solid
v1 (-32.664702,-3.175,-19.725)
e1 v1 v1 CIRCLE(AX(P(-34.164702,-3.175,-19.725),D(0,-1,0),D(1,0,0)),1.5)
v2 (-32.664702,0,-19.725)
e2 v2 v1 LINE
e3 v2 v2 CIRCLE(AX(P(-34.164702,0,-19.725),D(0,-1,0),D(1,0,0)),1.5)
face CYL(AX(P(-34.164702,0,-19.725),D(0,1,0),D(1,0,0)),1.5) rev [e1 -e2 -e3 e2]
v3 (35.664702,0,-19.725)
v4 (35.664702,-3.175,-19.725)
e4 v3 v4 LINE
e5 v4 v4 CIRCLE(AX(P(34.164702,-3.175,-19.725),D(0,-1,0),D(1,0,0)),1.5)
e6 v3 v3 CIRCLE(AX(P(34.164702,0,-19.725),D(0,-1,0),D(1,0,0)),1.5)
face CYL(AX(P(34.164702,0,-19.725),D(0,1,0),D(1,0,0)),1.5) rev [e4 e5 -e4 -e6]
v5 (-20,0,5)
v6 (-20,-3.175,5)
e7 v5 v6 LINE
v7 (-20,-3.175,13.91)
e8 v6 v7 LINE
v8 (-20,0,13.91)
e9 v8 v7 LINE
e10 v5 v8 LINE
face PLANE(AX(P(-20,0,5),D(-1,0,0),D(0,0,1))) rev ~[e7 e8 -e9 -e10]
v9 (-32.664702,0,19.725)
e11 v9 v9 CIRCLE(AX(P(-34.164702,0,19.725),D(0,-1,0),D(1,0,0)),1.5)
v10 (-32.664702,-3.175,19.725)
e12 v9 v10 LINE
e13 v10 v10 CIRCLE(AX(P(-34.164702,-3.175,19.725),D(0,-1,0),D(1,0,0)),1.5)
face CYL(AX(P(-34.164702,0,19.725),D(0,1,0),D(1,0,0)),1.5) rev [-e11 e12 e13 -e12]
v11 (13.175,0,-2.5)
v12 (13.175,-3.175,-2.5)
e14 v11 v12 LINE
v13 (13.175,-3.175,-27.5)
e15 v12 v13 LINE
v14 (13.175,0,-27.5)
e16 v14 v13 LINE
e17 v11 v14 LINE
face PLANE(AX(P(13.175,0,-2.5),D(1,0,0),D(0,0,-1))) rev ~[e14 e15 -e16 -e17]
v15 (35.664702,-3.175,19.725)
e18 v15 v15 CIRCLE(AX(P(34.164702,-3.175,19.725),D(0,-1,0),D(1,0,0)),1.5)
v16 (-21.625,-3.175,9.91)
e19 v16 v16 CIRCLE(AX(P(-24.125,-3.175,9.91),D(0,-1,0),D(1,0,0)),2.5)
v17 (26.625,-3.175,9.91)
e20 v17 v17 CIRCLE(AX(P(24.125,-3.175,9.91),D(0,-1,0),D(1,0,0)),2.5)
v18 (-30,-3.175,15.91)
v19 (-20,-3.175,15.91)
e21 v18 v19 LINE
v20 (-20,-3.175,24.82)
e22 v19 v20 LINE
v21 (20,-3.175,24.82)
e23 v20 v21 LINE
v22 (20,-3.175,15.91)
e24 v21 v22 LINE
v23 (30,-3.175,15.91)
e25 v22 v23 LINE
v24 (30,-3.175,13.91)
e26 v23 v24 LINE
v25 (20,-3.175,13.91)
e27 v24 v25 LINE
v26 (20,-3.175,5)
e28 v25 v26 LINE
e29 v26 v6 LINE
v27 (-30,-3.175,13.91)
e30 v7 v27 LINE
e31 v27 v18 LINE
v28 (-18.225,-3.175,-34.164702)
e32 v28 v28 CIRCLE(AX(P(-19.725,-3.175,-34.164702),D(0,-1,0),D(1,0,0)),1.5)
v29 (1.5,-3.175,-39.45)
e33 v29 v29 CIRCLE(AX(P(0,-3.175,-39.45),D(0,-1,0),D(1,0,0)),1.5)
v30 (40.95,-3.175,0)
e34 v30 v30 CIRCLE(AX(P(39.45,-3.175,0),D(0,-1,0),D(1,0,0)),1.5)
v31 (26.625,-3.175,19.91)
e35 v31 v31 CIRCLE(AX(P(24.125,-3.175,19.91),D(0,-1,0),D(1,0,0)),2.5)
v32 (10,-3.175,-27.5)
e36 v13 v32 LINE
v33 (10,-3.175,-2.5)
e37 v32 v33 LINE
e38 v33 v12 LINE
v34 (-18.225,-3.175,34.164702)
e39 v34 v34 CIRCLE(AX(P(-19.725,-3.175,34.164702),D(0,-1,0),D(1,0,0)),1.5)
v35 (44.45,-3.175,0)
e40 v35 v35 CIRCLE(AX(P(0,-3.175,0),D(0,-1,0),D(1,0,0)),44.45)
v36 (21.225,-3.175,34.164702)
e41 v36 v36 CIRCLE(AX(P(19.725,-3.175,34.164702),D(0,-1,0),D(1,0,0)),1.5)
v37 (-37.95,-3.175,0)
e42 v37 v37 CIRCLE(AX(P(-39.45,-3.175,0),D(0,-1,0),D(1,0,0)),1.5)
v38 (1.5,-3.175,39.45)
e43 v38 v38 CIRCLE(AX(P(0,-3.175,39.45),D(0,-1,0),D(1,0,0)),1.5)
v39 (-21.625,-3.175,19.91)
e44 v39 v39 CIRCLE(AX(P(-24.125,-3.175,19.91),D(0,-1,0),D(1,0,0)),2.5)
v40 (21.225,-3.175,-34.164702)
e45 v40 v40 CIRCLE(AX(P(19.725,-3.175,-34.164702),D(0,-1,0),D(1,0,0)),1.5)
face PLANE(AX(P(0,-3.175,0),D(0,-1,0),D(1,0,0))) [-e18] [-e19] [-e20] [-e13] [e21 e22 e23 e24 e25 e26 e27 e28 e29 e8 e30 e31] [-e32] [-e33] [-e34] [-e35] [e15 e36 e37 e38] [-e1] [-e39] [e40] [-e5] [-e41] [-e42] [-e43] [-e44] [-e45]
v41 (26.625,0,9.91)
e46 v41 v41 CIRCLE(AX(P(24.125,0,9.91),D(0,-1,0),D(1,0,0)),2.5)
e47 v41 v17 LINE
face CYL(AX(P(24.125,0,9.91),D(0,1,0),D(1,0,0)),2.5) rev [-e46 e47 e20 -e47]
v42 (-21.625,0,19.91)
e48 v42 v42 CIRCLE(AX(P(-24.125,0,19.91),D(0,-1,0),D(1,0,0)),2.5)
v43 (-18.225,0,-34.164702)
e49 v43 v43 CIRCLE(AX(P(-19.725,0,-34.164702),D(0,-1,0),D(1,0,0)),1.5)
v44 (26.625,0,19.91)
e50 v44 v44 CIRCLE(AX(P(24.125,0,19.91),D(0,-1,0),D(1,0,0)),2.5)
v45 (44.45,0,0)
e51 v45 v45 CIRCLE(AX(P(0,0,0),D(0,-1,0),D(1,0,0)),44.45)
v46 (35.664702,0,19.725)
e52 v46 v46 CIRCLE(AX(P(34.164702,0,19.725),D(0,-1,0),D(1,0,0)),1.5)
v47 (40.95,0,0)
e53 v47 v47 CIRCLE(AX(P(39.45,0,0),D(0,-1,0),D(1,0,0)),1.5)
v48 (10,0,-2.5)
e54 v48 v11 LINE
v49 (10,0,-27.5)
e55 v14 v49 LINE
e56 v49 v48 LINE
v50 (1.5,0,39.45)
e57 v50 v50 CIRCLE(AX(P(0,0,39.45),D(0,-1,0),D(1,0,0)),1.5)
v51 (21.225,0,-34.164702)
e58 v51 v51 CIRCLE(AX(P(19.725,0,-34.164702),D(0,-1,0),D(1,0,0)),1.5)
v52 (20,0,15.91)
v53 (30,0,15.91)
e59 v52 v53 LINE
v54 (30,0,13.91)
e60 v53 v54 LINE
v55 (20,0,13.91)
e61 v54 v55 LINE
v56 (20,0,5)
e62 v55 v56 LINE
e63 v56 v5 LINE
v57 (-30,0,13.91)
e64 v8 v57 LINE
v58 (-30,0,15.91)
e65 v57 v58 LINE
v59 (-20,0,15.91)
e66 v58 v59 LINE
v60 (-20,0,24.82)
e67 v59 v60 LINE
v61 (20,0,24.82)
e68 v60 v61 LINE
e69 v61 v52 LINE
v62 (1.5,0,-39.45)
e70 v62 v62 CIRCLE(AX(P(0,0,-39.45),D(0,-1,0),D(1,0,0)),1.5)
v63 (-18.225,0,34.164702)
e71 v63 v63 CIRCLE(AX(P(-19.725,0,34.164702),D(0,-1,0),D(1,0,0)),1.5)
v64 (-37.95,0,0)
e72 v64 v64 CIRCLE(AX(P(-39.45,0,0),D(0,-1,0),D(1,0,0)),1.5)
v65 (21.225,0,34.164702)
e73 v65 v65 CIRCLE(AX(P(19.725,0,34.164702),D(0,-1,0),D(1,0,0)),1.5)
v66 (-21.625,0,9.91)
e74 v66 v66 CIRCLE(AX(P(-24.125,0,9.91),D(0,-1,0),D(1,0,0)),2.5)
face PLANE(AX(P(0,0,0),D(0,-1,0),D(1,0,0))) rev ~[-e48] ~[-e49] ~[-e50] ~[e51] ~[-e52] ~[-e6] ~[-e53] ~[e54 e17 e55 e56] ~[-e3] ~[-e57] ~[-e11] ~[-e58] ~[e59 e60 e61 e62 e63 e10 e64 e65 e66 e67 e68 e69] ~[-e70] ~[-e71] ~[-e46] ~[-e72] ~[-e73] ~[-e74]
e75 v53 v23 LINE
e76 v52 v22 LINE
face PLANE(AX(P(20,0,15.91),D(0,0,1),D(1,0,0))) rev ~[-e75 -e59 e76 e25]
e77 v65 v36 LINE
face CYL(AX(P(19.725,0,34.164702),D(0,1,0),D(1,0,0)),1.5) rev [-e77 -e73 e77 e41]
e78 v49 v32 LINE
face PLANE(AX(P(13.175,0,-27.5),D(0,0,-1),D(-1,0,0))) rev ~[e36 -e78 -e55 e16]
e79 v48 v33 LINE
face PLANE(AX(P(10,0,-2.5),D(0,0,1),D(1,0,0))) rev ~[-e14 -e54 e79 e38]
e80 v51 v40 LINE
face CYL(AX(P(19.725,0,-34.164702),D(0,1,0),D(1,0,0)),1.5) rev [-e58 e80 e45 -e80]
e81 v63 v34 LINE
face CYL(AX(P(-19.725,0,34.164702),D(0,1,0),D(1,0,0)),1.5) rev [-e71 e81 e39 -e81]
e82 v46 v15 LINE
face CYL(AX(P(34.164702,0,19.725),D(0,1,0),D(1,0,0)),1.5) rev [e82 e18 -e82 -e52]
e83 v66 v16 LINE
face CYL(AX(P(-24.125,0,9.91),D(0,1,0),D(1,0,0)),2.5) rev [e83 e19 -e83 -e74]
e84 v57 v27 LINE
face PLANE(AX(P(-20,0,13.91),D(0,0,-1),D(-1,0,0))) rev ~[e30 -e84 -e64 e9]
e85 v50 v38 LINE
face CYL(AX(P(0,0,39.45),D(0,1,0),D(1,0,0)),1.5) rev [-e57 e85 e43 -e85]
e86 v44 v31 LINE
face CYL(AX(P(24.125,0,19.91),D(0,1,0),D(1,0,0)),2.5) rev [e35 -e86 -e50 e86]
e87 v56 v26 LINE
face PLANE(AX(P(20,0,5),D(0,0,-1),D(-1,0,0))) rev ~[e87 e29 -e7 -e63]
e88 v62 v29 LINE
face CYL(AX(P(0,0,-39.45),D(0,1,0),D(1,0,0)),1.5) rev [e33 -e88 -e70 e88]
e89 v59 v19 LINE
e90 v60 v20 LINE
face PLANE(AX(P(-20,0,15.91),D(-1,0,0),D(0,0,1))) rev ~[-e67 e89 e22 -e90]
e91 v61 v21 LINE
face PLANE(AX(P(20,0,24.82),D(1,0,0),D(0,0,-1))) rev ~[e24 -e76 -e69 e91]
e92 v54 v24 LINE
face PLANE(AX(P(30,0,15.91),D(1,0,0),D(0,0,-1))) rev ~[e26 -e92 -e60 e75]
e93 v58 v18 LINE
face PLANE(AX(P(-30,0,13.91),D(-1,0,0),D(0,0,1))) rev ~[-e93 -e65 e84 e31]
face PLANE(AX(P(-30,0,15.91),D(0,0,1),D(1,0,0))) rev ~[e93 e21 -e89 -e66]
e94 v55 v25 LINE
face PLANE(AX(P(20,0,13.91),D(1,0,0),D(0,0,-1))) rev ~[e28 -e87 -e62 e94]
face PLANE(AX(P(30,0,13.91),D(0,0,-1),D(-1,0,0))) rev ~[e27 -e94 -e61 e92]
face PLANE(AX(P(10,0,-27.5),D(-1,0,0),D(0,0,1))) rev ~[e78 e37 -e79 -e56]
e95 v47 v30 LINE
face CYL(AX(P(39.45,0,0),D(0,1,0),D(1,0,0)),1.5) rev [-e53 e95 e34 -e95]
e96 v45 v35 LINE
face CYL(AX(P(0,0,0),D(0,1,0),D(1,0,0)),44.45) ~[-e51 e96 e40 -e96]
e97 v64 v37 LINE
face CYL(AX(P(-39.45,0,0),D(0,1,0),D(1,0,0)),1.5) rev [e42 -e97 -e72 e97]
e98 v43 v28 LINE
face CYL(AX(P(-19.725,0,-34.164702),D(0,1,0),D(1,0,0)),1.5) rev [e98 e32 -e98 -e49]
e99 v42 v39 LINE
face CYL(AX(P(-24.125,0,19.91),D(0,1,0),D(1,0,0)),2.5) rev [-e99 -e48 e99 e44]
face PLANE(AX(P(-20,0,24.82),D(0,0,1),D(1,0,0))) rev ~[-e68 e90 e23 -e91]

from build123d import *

# Parameters (mm, degrees)
F0_R     = 44.45
F0_R_2   = 1.5
F0_R_3   = 2.5
F1_DEPTH = 3.175


# Not quite as in the source:
# - a length typed as a fraction of an inch, garbled in the dataset ("3 / 203.2 mm" for 3/8 in), is restored


with BuildPart() as f1:
    # F0 (on Front) → F1 (new body)
    with BuildSketch(Plane.XZ):
        Circle(F0_R)
        with Locations((-19.725, -34.1647021793)):
            Circle(F0_R_2, mode=Mode.SUBTRACT)
        with Locations((-34.1647021793, -19.725)):
            Circle(F0_R_2, mode=Mode.SUBTRACT)
        with Locations((0, -39.45)):
            Circle(F0_R_2, mode=Mode.SUBTRACT)
        with Locations((19.725, -34.1647021793)):
            Circle(F0_R_2, mode=Mode.SUBTRACT)
        Polygon((10, -27.5), (10, -15), (10, -2.5), (13.175, -2.5), (13.175, -15), (13.175, -27.5), align=None, mode=Mode.SUBTRACT)
        with Locations((34.1647021793, -19.725)):
            Circle(F0_R_2, mode=Mode.SUBTRACT)
        with Locations((-39.45, 0)):
            Circle(F0_R_2, mode=Mode.SUBTRACT)
        with Locations((-24.125, 9.91)):
            Circle(F0_R_3, mode=Mode.SUBTRACT)
        with Locations((-34.1647021793, 19.725)):
            Circle(F0_R_2, mode=Mode.SUBTRACT)
        with Locations((-24.125, 19.91)):
            Circle(F0_R_3, mode=Mode.SUBTRACT)
        with Locations((-19.725, 34.1647021793)):
            Circle(F0_R_2, mode=Mode.SUBTRACT)
        Polygon((-20, 15.91), (-20, 24.82), (20, 24.82), (20, 15.91), (30, 15.91), (30, 13.91), (20, 13.91), (20, 5), (-20, 5), (-20, 13.91), (-30, 13.91), (-30, 15.91), align=None, mode=Mode.SUBTRACT)
        with Locations((24.125, 9.91)):
            Circle(F0_R_3, mode=Mode.SUBTRACT)
        with Locations((39.45, 0)):
            Circle(F0_R_2, mode=Mode.SUBTRACT)
        with Locations((24.125, 19.91)):
            Circle(F0_R_3, mode=Mode.SUBTRACT)
        with Locations((34.1647021793, 19.725)):
            Circle(F0_R_2, mode=Mode.SUBTRACT)
        with Locations((0, 39.45)):
            Circle(F0_R_2, mode=Mode.SUBTRACT)
        with Locations((19.725, 34.1647021793)):
            Circle(F0_R_2, mode=Mode.SUBTRACT)
    extrude(amount=F1_DEPTH)


solid = f1.part
